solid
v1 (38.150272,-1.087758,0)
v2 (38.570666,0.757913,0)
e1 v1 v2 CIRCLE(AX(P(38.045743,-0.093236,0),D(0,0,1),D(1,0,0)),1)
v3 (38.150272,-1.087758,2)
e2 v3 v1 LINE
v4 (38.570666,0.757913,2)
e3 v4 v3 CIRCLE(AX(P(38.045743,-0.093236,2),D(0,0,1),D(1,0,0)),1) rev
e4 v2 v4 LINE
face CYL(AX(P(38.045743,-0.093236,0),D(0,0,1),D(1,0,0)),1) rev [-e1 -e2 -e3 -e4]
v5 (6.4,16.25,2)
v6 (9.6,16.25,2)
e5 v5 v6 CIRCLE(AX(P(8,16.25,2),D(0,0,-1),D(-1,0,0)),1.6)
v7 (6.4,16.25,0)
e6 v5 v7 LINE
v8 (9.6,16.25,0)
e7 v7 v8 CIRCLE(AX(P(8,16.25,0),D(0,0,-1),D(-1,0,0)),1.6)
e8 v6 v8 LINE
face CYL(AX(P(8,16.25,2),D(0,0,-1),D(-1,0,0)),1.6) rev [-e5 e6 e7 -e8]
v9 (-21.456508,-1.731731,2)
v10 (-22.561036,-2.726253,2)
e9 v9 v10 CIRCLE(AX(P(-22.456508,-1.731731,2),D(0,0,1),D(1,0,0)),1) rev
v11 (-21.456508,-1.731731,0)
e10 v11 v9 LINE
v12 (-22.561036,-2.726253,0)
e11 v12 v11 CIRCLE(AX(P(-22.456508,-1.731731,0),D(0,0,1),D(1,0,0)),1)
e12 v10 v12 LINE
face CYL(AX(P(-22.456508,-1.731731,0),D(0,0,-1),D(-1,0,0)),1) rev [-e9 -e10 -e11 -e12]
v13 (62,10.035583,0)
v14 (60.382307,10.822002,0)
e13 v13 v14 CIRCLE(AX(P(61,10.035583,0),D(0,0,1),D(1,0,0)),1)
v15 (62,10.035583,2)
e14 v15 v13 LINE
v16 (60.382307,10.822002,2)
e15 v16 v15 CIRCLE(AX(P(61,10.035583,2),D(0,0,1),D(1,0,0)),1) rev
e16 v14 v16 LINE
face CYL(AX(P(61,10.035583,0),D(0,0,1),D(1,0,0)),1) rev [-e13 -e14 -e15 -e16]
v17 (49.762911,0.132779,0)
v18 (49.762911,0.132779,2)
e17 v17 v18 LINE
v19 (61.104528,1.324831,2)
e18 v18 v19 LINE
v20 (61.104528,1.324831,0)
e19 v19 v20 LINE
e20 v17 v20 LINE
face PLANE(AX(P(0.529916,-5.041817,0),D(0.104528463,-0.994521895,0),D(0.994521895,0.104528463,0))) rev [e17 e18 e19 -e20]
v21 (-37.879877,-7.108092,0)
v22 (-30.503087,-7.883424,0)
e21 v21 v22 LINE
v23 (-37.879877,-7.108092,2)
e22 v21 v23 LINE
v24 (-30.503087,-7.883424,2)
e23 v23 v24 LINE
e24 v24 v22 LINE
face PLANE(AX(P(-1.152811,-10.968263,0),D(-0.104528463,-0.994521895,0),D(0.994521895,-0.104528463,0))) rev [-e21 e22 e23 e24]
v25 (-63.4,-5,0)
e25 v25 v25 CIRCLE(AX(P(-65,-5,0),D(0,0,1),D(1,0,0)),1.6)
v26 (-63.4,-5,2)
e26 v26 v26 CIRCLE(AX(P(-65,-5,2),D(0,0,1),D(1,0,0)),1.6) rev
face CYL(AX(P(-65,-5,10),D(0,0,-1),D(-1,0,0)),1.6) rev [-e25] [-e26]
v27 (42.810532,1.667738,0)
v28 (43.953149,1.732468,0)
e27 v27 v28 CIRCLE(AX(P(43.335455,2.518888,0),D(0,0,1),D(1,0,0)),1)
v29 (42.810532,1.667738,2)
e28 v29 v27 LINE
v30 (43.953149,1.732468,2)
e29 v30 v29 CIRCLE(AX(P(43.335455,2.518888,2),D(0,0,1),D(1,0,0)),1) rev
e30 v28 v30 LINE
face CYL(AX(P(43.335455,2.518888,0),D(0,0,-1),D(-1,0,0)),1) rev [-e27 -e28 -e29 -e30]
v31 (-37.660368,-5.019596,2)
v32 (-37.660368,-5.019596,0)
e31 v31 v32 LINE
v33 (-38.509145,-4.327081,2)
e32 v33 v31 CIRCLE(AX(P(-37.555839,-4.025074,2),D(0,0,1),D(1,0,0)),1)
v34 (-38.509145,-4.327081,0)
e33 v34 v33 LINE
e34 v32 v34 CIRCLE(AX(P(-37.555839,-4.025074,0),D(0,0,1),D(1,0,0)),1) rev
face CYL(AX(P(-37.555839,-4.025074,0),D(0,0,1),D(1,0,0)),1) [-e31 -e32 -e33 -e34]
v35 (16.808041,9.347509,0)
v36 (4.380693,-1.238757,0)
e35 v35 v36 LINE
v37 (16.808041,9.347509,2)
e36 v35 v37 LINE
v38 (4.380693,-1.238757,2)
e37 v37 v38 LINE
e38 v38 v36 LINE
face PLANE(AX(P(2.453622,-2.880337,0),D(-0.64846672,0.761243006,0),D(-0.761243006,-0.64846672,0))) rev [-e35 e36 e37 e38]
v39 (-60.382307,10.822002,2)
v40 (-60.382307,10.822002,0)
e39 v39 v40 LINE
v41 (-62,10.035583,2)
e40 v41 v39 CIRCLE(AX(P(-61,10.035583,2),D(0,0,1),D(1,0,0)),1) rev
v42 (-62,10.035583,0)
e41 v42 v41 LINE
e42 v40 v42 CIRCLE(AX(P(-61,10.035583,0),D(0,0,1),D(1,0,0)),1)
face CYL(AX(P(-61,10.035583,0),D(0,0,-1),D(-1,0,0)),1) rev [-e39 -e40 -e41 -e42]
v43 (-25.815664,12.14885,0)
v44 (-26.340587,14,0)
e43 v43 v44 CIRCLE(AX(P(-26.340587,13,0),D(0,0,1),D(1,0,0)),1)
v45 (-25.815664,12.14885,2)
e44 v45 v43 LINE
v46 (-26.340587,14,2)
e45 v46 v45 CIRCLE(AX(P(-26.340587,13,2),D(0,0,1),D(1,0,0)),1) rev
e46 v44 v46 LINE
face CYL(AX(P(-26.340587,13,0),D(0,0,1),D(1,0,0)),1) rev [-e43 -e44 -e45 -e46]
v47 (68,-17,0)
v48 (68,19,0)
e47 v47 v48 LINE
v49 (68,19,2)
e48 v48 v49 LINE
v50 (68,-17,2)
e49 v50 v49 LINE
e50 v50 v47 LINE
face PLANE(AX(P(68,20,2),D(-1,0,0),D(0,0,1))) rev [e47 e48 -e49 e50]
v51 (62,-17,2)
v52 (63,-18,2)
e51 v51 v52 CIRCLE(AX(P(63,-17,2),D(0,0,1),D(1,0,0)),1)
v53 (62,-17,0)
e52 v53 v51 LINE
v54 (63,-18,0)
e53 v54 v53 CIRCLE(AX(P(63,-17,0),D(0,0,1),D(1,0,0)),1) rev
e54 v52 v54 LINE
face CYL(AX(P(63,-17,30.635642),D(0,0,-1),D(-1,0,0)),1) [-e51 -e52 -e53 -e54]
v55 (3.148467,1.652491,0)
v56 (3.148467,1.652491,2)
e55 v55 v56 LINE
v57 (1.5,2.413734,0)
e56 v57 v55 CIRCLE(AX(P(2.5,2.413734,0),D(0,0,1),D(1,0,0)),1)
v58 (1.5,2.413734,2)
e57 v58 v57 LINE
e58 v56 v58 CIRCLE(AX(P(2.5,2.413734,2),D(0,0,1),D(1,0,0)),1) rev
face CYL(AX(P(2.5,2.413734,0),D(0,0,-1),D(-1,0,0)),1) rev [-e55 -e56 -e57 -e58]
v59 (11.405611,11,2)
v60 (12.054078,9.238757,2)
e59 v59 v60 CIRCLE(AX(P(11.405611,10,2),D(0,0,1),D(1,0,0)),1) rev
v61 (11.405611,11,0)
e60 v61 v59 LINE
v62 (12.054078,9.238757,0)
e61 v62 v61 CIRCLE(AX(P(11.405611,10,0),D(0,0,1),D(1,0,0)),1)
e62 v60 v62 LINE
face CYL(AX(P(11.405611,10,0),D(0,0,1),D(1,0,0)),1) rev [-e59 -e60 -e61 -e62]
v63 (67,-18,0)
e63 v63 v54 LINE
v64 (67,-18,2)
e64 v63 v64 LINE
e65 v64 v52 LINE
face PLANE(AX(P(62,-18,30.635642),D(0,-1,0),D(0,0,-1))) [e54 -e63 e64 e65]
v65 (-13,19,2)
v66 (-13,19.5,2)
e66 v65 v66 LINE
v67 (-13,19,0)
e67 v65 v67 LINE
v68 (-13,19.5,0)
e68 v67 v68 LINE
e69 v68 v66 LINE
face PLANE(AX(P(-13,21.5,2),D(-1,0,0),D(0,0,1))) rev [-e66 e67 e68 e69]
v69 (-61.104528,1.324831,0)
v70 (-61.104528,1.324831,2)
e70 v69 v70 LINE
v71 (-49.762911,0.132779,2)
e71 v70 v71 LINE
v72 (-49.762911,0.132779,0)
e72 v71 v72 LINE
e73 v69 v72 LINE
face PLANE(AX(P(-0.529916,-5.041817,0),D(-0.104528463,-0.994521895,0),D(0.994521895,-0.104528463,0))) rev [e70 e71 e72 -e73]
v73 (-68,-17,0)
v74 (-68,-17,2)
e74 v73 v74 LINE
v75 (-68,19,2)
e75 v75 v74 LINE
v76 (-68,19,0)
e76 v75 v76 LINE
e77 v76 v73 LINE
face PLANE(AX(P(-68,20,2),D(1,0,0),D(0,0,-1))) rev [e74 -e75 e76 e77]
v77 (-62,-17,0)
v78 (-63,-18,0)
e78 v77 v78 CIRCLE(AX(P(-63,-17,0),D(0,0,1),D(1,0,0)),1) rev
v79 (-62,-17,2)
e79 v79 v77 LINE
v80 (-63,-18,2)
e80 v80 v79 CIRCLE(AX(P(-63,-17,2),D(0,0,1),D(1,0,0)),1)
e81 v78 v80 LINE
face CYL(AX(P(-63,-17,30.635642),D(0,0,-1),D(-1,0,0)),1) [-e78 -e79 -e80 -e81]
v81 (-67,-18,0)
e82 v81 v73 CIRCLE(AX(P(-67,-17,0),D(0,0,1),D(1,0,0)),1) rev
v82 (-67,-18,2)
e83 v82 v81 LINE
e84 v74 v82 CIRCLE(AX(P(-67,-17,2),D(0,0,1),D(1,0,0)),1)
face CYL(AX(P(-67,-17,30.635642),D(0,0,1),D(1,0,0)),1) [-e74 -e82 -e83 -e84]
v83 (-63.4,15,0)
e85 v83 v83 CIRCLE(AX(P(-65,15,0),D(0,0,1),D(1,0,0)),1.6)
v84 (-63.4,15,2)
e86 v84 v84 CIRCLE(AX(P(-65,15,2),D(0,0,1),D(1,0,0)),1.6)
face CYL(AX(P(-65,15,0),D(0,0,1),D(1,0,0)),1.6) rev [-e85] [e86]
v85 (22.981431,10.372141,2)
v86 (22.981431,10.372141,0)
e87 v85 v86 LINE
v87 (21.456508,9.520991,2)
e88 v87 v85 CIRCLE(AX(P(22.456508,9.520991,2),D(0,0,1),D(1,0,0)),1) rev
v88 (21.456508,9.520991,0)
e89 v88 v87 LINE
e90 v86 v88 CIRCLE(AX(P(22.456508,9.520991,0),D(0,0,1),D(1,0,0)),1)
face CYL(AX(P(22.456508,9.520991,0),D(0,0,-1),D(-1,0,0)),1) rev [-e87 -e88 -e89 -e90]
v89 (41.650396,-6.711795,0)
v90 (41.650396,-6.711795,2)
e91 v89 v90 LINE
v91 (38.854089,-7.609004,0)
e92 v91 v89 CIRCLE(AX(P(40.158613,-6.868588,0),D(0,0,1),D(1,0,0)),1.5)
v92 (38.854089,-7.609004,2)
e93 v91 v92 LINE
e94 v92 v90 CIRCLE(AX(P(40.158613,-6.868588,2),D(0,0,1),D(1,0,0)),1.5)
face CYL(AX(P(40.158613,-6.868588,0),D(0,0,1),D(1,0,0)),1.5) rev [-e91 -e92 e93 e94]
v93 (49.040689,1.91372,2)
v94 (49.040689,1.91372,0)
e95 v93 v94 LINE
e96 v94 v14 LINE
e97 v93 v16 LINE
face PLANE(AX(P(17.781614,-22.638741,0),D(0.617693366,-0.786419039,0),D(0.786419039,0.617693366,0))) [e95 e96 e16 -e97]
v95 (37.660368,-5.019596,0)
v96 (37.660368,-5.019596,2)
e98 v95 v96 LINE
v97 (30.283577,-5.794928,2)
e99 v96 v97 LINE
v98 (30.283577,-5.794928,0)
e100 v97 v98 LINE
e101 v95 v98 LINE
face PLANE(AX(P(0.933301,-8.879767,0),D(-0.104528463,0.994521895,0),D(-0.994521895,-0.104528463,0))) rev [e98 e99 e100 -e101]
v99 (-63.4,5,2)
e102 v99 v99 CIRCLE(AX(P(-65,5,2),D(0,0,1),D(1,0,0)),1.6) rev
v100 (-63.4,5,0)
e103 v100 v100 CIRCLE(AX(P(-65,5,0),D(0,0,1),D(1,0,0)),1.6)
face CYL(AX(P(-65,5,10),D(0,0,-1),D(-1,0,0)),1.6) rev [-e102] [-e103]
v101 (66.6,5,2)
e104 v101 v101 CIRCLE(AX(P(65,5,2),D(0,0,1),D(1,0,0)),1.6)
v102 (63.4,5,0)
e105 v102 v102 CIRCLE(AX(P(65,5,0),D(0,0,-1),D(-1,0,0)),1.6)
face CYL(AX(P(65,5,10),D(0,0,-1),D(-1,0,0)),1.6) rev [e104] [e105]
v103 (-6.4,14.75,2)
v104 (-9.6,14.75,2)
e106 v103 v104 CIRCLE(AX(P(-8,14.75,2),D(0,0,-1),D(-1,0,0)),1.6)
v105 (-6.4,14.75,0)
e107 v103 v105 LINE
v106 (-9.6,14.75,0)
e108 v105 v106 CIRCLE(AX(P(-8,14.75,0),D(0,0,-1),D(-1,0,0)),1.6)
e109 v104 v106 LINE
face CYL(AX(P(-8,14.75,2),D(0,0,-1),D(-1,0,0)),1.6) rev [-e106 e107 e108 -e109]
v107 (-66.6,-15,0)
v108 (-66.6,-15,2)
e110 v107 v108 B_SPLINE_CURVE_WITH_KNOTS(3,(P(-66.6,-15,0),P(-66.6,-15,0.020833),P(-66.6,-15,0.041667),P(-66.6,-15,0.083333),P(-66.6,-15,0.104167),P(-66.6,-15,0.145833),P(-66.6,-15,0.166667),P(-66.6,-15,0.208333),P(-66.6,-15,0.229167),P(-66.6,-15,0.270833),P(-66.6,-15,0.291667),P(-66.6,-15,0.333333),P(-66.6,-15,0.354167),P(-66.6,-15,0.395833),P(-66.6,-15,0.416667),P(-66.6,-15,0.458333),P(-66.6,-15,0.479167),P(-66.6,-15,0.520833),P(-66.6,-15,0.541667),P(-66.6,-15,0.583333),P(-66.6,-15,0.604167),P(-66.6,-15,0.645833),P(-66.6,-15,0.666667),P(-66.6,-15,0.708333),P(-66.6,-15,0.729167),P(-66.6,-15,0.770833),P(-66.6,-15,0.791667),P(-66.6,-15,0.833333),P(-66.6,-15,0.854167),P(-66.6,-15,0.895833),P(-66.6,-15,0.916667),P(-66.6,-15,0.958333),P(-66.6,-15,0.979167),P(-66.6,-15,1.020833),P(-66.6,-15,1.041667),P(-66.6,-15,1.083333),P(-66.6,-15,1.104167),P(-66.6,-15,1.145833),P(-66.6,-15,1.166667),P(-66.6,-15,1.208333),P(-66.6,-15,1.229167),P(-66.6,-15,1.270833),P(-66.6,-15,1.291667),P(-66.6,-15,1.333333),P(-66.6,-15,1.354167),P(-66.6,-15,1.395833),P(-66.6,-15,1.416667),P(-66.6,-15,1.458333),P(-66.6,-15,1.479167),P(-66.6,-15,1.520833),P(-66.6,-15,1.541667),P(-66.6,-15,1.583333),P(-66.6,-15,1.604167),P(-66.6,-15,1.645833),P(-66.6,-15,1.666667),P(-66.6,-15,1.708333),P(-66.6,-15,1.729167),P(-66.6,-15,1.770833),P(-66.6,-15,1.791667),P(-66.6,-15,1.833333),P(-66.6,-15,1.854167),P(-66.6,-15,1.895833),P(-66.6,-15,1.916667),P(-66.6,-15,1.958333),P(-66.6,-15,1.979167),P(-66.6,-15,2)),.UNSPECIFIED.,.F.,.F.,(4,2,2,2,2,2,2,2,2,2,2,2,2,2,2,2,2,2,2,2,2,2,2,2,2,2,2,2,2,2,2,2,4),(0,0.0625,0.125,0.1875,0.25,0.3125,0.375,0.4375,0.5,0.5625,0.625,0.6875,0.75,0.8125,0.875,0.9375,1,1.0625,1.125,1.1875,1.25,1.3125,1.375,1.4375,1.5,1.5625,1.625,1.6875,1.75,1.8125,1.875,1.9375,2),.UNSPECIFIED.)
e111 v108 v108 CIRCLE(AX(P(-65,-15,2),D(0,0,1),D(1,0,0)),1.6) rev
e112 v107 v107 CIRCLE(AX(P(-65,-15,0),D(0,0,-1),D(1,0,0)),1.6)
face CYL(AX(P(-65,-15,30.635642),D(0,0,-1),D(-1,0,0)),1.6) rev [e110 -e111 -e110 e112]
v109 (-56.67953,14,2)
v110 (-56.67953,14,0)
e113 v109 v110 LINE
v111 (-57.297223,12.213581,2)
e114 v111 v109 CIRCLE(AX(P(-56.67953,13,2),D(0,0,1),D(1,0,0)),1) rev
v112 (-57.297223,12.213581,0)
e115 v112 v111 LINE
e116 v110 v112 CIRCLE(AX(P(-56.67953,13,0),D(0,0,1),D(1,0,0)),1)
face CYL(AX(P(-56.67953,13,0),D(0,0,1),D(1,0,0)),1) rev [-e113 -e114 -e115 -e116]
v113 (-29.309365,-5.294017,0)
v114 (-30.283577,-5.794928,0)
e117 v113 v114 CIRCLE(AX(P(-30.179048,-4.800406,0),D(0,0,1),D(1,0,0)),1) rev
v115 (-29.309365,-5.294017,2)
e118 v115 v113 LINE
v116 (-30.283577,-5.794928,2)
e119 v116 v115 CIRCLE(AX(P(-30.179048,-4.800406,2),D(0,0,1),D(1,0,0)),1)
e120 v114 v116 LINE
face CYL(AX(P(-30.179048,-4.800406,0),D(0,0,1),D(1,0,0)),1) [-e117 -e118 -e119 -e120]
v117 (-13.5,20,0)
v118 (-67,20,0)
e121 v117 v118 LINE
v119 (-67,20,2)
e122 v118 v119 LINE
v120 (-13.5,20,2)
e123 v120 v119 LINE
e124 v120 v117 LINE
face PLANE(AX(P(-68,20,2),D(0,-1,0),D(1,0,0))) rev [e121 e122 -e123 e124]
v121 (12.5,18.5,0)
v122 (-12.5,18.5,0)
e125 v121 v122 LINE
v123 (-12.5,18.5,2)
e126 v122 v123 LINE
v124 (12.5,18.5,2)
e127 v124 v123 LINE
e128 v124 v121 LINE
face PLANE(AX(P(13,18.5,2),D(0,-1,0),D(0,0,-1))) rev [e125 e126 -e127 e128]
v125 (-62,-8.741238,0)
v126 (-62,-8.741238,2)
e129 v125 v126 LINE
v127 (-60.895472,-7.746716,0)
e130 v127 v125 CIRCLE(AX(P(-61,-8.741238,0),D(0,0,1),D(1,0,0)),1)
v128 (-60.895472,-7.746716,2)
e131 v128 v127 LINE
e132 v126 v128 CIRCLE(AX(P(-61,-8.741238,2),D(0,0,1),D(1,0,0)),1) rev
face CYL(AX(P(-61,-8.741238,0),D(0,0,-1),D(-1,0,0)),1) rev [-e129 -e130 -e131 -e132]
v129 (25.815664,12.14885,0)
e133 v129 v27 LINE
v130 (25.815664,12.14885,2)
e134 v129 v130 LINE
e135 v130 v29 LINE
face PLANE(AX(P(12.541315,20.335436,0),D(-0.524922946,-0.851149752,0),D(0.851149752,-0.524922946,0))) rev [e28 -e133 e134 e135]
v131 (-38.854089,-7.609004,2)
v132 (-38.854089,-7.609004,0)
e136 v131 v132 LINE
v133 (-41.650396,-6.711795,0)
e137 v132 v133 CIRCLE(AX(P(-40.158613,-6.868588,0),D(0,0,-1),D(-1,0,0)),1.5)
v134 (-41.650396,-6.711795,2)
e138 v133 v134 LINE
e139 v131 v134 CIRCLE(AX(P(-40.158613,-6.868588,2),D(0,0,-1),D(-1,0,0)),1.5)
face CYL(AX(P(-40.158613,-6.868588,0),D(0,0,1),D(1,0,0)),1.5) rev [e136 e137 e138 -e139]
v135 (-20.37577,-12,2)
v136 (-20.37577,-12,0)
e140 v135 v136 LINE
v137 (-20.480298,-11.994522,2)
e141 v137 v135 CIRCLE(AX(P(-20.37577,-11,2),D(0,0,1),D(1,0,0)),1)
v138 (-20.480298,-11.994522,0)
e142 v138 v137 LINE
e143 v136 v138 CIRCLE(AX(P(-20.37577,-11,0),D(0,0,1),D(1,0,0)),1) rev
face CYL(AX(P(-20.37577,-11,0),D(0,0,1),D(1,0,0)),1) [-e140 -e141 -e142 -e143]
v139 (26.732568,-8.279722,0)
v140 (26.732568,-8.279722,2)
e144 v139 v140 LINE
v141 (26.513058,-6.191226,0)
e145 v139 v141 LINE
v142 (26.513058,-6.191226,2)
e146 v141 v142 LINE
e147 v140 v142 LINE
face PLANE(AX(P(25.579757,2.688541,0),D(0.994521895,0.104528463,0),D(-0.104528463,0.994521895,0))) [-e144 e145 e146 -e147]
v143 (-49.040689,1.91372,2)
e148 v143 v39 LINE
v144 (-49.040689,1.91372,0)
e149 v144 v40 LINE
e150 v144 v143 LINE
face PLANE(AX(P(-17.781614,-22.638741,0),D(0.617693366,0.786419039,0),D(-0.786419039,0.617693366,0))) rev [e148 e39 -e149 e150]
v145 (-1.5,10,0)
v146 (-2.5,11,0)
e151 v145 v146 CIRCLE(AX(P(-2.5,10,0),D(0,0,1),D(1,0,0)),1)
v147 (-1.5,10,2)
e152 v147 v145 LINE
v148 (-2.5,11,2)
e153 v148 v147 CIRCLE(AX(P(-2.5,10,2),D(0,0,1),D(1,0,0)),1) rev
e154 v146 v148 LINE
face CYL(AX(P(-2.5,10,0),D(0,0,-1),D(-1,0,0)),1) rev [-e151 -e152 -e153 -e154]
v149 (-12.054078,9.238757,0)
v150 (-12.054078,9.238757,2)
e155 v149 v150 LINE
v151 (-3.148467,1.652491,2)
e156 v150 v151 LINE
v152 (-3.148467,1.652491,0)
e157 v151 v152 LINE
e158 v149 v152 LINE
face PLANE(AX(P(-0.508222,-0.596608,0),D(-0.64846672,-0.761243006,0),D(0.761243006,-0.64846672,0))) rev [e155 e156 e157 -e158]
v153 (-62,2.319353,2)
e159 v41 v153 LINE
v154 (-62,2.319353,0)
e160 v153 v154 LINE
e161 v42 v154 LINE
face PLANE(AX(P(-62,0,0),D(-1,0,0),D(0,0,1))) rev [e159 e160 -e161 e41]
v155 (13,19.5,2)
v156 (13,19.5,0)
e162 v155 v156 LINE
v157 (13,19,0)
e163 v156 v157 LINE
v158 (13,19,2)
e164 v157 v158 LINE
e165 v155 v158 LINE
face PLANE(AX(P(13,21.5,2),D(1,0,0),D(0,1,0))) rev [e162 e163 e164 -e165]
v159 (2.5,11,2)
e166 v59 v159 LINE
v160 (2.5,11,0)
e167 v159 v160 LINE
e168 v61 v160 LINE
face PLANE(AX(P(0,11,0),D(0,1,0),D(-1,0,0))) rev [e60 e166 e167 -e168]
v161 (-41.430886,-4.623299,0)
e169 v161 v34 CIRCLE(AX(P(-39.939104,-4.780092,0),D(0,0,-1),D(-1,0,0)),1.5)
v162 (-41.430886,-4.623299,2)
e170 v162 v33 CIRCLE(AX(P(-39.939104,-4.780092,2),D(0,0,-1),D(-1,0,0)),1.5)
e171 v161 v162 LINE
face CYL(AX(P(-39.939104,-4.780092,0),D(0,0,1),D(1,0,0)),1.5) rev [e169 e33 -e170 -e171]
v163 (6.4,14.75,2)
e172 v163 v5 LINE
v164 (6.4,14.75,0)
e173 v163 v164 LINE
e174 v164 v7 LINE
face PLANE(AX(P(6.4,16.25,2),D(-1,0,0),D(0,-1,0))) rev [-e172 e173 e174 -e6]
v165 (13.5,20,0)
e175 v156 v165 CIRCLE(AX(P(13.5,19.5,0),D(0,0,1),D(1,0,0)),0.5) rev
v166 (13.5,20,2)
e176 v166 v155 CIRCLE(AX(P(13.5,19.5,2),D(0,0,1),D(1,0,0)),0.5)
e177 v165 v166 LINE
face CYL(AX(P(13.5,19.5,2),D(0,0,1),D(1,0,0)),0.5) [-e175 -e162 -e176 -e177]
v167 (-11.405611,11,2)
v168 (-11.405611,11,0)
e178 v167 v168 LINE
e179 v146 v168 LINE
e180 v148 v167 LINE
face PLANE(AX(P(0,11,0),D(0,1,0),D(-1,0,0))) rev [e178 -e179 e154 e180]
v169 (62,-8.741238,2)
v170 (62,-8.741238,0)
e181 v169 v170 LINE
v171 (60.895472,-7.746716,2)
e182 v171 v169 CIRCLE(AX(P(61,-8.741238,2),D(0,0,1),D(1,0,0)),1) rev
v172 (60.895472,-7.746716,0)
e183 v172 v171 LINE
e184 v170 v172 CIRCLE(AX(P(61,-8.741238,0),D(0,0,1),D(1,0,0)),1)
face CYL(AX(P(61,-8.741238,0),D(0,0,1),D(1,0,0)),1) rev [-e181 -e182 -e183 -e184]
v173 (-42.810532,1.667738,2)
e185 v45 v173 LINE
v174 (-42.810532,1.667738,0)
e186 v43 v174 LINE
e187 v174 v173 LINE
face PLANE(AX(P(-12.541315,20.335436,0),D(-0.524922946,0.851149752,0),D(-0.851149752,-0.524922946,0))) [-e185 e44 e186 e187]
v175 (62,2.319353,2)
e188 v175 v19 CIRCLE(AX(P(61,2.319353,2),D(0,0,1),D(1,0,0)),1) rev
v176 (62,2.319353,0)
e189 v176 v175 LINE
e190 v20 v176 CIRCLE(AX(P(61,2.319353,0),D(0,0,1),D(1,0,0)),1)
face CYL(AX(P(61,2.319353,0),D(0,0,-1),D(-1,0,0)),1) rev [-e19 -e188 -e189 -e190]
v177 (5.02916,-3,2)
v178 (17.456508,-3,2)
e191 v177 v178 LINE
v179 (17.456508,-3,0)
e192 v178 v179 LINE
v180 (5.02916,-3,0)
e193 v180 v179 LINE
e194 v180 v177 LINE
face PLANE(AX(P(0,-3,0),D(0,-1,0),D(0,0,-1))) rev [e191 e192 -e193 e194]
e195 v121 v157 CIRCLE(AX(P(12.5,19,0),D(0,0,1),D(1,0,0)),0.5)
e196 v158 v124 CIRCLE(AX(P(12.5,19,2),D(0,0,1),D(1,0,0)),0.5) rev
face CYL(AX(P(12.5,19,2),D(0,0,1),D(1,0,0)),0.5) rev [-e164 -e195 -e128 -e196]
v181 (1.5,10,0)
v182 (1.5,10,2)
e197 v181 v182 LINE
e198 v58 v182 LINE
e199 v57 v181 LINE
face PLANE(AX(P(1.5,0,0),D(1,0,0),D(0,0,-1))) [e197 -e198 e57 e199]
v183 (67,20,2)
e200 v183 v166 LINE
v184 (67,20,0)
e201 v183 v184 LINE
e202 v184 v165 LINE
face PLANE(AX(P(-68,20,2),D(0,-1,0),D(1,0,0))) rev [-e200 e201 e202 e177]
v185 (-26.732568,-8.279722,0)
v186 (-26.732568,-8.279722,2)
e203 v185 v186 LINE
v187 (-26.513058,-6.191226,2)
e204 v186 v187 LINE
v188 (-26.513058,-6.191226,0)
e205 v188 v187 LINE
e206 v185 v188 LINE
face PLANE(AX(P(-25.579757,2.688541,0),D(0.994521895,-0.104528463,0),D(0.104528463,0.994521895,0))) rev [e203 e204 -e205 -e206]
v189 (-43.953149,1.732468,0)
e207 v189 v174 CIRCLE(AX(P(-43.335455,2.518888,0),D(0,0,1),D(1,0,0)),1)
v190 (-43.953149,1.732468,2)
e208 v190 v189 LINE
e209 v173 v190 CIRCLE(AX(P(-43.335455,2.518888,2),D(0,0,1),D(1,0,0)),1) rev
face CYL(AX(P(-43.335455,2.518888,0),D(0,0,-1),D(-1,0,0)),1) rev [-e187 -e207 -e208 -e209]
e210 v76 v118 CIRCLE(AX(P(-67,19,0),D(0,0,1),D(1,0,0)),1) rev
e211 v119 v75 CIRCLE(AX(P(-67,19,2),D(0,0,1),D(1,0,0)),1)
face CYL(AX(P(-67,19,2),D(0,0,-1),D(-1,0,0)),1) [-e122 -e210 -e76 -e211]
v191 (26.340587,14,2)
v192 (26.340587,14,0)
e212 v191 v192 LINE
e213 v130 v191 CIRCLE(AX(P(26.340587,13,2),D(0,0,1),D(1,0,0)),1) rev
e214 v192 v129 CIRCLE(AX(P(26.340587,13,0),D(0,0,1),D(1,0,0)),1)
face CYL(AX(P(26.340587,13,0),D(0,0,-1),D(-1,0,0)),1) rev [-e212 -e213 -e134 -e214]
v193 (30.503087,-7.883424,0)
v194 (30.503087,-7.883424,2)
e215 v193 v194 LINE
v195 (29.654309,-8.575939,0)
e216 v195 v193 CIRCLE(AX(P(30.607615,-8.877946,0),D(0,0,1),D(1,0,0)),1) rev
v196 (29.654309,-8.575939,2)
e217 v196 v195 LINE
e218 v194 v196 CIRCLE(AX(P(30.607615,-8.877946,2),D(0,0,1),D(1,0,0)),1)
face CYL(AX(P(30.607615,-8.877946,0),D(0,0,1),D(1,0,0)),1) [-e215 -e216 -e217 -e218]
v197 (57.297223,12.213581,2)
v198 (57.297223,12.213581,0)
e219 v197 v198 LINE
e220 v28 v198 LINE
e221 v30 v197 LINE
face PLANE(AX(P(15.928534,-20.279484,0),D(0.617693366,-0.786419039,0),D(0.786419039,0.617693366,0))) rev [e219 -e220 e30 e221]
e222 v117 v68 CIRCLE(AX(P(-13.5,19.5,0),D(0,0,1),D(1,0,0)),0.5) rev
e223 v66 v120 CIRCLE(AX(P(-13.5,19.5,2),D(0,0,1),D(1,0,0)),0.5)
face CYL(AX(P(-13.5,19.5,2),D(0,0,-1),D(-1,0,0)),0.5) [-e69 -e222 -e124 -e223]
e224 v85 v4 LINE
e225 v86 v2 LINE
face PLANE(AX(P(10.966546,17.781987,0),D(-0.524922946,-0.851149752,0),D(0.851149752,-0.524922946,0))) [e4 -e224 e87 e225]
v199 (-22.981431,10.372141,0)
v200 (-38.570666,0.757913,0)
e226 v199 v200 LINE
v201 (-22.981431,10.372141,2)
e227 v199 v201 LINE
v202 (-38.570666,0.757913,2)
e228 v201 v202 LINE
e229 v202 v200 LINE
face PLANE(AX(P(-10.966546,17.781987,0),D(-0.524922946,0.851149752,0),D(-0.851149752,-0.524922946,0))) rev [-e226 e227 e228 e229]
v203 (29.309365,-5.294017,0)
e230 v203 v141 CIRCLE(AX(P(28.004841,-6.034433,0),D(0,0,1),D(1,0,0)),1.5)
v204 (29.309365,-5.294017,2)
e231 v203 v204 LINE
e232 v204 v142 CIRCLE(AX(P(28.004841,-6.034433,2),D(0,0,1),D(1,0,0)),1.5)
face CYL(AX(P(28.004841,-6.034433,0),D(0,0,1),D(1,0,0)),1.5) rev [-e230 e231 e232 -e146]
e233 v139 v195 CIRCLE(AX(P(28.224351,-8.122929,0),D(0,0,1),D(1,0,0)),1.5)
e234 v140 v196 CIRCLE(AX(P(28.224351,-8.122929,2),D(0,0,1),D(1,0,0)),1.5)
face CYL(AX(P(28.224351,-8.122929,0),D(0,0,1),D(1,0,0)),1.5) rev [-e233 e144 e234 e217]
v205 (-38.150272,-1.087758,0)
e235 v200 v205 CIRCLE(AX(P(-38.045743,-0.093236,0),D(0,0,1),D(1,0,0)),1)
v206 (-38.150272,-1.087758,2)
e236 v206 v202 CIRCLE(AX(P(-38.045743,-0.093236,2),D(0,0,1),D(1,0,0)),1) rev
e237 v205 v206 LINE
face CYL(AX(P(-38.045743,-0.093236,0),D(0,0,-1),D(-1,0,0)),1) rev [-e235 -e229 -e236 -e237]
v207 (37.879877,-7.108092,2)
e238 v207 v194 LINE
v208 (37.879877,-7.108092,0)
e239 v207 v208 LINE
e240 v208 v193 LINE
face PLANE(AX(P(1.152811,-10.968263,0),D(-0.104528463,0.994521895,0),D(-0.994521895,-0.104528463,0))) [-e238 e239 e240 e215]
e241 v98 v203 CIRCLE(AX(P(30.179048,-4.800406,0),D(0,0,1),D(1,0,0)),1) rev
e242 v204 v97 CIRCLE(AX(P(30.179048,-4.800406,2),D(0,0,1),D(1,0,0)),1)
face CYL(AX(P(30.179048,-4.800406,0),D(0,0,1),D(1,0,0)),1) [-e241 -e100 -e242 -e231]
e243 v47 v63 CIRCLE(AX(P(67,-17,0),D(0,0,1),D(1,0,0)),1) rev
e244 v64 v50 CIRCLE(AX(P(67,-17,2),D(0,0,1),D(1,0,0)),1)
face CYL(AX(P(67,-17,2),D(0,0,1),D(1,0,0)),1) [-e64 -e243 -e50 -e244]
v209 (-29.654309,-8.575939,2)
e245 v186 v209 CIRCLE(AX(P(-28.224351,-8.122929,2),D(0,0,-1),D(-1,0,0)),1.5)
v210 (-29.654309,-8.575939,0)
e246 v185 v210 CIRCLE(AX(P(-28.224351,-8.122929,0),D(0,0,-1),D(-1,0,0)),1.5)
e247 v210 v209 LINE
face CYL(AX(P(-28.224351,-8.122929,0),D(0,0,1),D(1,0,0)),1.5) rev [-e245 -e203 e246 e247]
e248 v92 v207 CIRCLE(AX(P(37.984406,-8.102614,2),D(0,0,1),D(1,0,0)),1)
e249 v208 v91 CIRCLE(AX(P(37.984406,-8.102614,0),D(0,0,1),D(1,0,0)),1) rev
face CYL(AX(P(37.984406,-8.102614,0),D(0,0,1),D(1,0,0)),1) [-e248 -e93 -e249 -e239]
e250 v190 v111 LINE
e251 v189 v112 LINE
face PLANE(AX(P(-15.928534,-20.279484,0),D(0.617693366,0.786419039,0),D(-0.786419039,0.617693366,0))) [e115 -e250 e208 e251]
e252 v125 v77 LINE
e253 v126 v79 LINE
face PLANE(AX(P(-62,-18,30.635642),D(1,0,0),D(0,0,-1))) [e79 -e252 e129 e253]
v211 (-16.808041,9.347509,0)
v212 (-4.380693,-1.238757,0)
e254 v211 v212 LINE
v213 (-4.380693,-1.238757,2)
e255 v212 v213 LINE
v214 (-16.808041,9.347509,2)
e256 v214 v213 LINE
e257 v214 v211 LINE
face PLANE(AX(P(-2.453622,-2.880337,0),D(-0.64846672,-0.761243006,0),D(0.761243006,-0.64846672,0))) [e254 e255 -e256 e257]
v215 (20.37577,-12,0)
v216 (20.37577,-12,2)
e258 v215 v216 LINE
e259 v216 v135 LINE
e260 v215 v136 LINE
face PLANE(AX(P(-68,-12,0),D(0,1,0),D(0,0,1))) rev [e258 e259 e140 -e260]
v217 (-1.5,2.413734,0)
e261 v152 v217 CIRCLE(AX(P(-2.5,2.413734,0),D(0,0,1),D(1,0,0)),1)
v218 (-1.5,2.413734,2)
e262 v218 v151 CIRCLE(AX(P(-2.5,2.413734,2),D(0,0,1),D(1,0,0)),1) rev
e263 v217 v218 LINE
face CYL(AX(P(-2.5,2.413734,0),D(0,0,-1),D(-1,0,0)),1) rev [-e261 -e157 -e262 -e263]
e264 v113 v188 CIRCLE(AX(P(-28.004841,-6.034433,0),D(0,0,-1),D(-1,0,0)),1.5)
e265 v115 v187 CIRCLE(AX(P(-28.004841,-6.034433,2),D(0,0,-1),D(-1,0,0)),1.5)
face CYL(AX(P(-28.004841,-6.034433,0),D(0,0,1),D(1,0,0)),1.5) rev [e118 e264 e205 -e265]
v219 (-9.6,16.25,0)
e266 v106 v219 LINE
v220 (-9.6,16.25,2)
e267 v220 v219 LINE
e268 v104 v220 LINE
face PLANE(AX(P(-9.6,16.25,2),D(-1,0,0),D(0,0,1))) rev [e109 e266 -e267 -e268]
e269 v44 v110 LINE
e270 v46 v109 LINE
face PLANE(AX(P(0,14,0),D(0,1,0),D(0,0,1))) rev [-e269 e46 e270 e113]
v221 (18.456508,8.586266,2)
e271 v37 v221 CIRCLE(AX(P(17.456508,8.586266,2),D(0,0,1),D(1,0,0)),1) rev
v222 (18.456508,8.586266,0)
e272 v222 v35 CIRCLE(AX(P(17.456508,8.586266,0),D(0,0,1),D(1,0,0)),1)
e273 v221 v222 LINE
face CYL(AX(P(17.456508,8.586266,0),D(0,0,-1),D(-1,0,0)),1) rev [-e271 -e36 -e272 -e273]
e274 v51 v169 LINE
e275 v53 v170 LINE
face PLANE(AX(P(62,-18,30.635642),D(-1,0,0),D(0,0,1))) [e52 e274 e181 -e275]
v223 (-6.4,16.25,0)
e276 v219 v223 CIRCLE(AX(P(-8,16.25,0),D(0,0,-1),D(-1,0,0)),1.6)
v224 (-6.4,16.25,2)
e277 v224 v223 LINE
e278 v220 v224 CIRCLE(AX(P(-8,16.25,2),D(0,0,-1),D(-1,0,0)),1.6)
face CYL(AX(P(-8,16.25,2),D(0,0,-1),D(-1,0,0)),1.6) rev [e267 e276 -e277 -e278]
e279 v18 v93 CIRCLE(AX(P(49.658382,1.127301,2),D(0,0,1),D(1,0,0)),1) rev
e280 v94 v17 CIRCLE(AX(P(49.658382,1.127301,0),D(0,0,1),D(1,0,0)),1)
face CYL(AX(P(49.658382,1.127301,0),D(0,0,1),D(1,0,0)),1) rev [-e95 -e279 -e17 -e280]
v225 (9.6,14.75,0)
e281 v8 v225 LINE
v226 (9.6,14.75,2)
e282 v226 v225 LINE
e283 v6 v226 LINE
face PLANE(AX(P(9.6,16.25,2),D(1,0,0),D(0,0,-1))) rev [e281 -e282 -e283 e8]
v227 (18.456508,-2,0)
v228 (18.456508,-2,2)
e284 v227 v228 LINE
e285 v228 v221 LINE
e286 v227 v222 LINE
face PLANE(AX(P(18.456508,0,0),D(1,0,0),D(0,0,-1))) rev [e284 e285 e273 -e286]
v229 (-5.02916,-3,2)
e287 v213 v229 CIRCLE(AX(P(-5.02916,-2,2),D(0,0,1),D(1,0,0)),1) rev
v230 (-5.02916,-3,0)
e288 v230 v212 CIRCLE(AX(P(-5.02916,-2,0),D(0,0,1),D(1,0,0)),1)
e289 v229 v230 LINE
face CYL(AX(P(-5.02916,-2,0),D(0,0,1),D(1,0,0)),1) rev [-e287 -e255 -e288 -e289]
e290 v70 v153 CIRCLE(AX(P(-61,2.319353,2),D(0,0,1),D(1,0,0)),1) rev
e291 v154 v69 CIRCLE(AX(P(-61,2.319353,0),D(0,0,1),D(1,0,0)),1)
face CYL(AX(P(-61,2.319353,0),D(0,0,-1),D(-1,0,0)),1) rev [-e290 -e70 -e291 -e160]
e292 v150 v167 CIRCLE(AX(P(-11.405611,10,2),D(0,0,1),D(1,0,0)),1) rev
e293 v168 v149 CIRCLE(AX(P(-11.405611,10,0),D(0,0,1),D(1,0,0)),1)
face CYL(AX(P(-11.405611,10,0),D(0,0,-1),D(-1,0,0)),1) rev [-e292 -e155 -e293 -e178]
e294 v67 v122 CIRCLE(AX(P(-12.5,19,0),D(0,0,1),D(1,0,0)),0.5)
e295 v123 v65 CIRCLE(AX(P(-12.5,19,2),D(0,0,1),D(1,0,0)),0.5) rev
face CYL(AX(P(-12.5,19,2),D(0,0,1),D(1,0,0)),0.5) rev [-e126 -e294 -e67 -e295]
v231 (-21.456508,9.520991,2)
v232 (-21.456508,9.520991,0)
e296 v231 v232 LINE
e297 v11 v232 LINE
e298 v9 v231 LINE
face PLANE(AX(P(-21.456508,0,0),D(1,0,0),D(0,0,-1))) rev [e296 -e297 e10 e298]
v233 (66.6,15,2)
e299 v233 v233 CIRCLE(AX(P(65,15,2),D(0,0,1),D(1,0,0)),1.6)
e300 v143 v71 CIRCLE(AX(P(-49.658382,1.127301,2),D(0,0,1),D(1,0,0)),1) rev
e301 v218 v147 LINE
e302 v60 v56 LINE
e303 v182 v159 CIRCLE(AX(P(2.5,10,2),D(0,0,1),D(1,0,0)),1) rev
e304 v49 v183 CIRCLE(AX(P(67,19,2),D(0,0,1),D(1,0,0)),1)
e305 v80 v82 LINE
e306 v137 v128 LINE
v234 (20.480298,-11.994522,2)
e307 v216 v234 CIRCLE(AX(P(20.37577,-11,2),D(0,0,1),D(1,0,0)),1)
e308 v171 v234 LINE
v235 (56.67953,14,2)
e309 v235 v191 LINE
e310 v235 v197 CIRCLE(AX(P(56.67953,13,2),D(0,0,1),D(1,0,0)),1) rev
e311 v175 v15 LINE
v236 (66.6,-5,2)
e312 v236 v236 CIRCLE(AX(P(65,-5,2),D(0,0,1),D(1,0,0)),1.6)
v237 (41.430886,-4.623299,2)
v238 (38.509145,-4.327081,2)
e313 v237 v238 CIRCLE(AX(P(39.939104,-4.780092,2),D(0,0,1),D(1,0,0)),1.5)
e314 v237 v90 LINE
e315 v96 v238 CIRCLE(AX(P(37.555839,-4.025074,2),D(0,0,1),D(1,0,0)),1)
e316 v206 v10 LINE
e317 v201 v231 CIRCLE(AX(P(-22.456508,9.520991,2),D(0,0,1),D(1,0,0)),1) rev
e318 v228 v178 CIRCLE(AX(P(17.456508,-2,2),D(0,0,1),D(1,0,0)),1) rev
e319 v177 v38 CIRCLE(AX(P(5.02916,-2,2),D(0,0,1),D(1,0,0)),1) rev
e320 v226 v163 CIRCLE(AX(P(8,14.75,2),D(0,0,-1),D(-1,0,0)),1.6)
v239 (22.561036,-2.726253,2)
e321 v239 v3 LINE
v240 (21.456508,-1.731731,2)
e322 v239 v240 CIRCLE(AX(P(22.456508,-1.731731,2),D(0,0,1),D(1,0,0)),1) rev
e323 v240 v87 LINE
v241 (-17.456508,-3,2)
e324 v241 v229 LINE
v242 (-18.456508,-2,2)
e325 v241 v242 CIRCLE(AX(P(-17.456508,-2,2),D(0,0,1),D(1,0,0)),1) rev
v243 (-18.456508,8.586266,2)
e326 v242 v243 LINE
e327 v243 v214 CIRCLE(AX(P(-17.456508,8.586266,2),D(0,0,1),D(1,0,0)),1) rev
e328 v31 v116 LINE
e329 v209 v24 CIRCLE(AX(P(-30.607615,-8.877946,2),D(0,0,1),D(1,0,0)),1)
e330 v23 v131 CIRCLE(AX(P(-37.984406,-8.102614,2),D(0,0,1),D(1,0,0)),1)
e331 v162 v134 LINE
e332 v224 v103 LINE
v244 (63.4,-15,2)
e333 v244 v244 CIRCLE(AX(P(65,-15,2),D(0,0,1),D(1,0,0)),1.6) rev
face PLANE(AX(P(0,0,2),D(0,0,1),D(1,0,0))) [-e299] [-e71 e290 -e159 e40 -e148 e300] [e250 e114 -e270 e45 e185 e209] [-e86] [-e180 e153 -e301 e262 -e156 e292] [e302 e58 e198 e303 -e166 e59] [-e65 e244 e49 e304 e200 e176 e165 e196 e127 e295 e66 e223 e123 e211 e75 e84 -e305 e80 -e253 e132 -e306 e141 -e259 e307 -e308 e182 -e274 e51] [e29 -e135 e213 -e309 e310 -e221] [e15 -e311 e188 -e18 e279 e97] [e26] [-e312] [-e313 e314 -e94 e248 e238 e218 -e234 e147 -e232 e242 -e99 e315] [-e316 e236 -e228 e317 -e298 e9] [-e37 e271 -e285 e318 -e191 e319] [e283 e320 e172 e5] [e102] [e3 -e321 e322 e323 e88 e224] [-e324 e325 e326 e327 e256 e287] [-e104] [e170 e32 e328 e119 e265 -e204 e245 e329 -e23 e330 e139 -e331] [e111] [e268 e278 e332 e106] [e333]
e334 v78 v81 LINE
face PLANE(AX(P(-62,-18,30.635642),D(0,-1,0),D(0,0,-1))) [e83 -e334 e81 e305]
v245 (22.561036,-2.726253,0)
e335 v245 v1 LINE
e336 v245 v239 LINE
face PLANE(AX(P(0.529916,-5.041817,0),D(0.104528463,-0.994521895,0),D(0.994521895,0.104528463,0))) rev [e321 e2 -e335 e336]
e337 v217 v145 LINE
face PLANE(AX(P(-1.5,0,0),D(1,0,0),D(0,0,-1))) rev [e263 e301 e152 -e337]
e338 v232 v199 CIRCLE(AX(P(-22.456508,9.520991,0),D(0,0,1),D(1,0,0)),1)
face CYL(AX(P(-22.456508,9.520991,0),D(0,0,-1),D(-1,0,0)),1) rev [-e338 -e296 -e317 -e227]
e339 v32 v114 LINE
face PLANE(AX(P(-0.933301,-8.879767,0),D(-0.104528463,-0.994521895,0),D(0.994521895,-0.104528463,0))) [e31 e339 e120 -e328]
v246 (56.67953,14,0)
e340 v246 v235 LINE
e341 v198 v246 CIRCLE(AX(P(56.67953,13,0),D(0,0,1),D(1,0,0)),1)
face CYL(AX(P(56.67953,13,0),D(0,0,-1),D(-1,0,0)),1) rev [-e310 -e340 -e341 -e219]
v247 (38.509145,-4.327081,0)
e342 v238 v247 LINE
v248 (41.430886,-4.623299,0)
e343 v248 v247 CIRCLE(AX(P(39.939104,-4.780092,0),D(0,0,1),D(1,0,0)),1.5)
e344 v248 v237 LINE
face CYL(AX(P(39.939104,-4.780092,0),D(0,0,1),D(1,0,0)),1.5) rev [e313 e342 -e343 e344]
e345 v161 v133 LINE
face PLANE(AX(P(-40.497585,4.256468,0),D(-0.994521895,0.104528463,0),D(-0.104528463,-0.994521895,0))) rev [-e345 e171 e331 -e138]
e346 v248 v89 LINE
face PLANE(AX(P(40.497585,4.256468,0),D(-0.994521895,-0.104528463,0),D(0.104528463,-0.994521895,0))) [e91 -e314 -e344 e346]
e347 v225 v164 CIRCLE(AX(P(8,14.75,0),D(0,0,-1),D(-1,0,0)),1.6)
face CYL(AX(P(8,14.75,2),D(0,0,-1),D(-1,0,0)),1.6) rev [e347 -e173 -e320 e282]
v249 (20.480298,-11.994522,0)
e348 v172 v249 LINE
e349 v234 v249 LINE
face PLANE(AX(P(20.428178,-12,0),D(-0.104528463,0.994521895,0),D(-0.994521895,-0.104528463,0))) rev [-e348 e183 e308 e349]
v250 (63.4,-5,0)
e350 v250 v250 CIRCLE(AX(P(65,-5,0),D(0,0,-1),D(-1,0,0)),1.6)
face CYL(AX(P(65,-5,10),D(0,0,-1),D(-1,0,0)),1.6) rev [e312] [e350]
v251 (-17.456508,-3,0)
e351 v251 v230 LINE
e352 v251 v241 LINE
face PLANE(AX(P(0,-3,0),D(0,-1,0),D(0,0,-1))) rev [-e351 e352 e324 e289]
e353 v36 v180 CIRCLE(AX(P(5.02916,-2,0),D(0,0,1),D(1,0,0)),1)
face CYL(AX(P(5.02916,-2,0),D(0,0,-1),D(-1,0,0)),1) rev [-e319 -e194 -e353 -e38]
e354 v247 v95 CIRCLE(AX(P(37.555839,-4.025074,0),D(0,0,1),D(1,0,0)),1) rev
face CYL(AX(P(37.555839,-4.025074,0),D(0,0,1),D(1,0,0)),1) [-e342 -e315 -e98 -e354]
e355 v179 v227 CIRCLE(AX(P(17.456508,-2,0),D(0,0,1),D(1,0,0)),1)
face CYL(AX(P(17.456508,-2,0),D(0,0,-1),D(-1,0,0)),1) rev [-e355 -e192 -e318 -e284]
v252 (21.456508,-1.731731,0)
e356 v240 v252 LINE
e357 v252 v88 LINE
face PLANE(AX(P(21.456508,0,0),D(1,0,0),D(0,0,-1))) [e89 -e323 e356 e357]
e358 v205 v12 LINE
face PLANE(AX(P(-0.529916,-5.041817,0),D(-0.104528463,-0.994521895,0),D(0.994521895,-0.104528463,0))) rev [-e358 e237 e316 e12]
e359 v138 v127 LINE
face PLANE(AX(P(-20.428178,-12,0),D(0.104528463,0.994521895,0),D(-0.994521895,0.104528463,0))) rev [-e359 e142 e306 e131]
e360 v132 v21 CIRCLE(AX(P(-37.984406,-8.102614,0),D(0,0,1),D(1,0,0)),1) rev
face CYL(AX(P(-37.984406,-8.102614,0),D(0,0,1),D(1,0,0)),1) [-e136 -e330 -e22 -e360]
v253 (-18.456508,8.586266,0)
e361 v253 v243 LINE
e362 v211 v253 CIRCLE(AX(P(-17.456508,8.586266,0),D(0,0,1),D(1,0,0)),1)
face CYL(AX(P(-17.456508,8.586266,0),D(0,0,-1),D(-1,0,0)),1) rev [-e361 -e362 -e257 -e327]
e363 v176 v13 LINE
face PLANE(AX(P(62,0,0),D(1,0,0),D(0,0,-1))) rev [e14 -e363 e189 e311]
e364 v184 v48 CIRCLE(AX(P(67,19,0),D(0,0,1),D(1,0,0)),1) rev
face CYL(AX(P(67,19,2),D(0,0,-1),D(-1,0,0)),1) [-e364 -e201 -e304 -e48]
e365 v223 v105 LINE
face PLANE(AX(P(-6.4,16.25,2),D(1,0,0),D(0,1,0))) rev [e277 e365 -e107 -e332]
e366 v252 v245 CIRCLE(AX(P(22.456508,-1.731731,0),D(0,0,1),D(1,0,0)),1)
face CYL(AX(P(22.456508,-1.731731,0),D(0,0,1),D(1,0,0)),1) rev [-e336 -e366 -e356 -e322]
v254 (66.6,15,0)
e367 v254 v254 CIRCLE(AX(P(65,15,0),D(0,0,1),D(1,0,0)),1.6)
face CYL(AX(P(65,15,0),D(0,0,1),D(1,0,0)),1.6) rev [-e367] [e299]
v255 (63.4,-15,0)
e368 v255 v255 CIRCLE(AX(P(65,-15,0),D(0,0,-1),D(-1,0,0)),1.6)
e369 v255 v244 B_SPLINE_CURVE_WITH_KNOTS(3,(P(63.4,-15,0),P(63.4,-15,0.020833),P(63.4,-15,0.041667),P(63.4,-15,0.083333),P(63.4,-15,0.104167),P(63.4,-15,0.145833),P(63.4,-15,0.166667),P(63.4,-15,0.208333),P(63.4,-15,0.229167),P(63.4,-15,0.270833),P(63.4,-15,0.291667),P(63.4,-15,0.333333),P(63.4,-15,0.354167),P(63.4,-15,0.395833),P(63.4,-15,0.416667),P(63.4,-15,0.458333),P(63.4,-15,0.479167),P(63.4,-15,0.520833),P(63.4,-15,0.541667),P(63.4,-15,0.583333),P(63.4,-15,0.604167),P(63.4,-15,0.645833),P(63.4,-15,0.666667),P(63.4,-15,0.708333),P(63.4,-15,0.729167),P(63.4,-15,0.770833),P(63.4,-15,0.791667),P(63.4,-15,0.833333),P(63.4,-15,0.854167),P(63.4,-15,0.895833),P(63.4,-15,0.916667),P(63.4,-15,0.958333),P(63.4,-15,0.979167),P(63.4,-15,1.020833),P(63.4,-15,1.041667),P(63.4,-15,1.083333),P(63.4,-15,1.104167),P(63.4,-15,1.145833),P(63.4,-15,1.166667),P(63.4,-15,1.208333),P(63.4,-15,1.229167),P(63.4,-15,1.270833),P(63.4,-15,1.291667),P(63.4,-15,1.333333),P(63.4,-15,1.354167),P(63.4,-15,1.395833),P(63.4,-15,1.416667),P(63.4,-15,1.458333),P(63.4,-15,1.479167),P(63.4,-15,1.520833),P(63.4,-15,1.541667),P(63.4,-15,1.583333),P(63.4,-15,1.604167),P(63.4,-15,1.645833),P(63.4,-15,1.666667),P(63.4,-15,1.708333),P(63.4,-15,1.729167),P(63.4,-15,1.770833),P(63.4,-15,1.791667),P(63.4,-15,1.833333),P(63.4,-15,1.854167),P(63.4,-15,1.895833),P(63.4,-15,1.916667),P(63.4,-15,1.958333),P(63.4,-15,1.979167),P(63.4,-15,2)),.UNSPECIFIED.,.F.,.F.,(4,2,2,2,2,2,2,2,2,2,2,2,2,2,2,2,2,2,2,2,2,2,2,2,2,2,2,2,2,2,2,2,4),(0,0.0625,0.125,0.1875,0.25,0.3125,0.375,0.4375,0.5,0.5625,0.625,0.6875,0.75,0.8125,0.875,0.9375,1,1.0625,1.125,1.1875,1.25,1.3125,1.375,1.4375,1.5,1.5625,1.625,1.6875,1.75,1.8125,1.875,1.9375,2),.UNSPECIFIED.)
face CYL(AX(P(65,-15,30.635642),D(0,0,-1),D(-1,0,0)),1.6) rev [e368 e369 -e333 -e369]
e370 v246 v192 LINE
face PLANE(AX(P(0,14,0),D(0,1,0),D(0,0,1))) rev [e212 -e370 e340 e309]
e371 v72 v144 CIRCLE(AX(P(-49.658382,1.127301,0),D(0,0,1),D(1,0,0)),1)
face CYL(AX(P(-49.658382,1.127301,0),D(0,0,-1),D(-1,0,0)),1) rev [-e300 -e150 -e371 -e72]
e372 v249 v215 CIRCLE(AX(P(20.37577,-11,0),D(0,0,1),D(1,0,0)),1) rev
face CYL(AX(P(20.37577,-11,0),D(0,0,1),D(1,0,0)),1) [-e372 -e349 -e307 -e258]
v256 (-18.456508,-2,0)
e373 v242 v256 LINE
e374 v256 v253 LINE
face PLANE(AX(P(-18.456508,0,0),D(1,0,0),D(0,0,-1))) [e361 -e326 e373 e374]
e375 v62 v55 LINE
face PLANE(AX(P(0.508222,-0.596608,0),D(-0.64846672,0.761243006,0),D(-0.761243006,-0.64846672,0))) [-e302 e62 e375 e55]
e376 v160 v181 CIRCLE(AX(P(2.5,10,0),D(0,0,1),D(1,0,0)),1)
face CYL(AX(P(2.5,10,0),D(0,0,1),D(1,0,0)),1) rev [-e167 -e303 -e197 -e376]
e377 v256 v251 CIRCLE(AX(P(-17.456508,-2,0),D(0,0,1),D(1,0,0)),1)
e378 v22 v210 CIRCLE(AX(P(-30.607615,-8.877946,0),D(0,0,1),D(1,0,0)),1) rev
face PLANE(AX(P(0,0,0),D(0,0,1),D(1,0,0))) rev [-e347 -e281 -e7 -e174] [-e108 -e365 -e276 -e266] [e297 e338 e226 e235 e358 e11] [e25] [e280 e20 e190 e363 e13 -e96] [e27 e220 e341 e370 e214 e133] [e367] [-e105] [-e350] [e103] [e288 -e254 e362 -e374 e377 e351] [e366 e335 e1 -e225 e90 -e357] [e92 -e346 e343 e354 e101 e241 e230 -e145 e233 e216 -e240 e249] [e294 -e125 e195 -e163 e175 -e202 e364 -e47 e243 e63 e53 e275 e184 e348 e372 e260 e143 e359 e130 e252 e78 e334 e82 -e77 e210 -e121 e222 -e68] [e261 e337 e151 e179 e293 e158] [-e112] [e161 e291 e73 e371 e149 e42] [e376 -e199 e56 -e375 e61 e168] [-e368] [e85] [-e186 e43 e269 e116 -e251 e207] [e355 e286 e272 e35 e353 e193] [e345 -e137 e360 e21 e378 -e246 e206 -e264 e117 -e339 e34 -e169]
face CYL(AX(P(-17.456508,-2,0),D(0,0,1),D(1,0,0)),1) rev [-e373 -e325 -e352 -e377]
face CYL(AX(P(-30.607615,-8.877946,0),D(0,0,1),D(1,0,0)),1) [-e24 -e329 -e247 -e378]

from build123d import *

# Parameters (mm, degrees)
SKETCH_1_W           = 136
SKETCH_1_H           = 40
EXTRUDE_1_DEPTH      = 2
SKETCH_3_R           = 1.6
CUT_EXTRUDE_3_DEPTH  = 71.908391605
CUT_EXTRUDE_5_DEPTH  = 71.908391605
SKETCH_7_W           = 136
SKETCH_7_H           = 8
CUT_EXTRUDE_6_DEPTH  = 71.908391605
CUT_EXTRUDE_7_DEPTH  = 71.908391605
CUT_EXTRUDE_START    = -2
CUT_EXTRUDE_8_DEPTH  = 2
FILLET_2_R           = 1
FILLET_3_R           = 1
SKETCH_11_W          = 26
SKETCH_11_H          = 3
CUT_EXTRUDE_9_DEPTH  = 71.908391605
FILLET_4_R           = 0.5
SKETCH_13_W          = 6
SKETCH_13_H          = 28
SKETCH_13_R          = 1.6
EXTRUDE_2_DEPTH      = 2
SKETCH_14_R          = 1.6
CUT_EXTRUDE_10_DEPTH = 10
FILLET_5_R           = 1
FILLET_6_R           = 1


# Read off the part's stored shape, not the designer's step: 切除-拉伸8
with BuildPart() as part:
    # 草图1 → 凸台-拉伸1 (new body)
    with BuildSketch(Plane.XY):
        Rectangle(SKETCH_1_W, SKETCH_1_H)
    extrude(amount=EXTRUDE_1_DEPTH)

    # 草图3 → 切除-拉伸3 (cut, through all)
    with BuildSketch(Plane.XY.offset(2)):
        with Locations((65, -5)):
            Circle(SKETCH_3_R)
        with Locations((65, 15)):
            Circle(SKETCH_3_R)
        with Locations((-65, 15)):
            Circle(SKETCH_3_R)
        with Locations((-65, -5)):
            Circle(SKETCH_3_R)
    extrude(amount=-CUT_EXTRUDE_3_DEPTH, mode=Mode.SUBTRACT)

    # 草图6 → 切除-拉伸5 (cut, through all)
    with BuildSketch(Plane.XY.offset(2)):
        with BuildLine():
            Line((26.513057993, -6.191225838), (29.496623679, -5.877640448))
            ThreePointArc((29.496623679, -5.877640448), (27.848048141, -4.5426503), (26.513057993, -6.191225838))
        make_face()
        Polygon((29.716133451, -7.966136428), (29.496623679, -5.877640448), (26.513057993, -6.191225838), (26.732567765, -8.279721818), align=None)
        with BuildLine():
            ThreePointArc((26.732567765, -8.279721818), (28.381143303, -9.614711966), (29.716133451, -7.966136428))
            Line((29.716133451, -7.966136428), (26.732567765, -8.279721818))
        make_face()
        Polygon((38.66683051, -7.025380259), (38.447320737, -4.936884279), (29.496623679, -5.877640448), (29.716133451, -7.966136428), align=None)
        Polygon((41.650396196, -6.711794869), (41.430886423, -4.623298889), (38.447320737, -4.936884279), (38.66683051, -7.025380259), align=None)
        with BuildLine():
            Line((38.447320737, -4.936884279), (41.430886423, -4.623298889))
            ThreePointArc((41.430886423, -4.623298889), (39.782310885, -3.288308741), (38.447320737, -4.936884279))
        make_face()
        with BuildLine():
            ThreePointArc((38.66683051, -7.025380259), (40.315406048, -8.360370407), (41.650396196, -6.711794869))
            Line((41.650396196, -6.711794869), (38.66683051, -7.025380259))
        make_face()
    cut_extrude_5 = extrude(amount=-CUT_EXTRUDE_5_DEPTH, mode=Mode.SUBTRACT)

    # 镜向1: 切除-拉伸5 across plane
    add(cut_extrude_5.mirror(Plane(origin=(0, 0, 0), x_dir=(0, 0, 1), z_dir=(1, 0, 0))), mode=Mode.SUBTRACT)

    # 草图7 → 切除-拉伸6 (cut, through all)
    with BuildSketch(Plane.XY.offset(2)):
        with Locations((0, -16)):
            Rectangle(SKETCH_7_W, SKETCH_7_H)
    extrude(amount=-CUT_EXTRUDE_6_DEPTH, mode=Mode.SUBTRACT)

    # 草图8 → 切除-拉伸7 (cut, through all)
    with BuildSketch(Plane.XY.offset(2)):
        Polygon((-68, -7), (-68, -12), (-20.428177729, -12), align=None)
        Polygon((20.428177729, -12), (68, -7), (68, -12), align=None)
    extrude(amount=-CUT_EXTRUDE_7_DEPTH, mode=Mode.SUBTRACT)

    # 切除-拉伸8 outline → 切除-拉伸8 (cut)
    with BuildSketch(Plane.XY.offset(2).offset(CUT_EXTRUDE_START)):
        Polygon((18.456507715, 10.75175987), (2.313148778, -3), (18.456507715, -3), align=None)
        Polygon((-18.456507715, 10.75175987), (-18.456507715, -3), (-2.313148778, -3), align=None)
        Polygon((-62, 12.092619933), (-62, 1.418949104), (-46.311418135, -0.229987295), align=None)
        Polygon((-21.456507715, 11.312594625), (-41.066399544, -0.781260963), (-21.456507715, -2.842343647), align=None)
        Polygon((-59.571610636, 14), (-43.404423487, 1.301471928), (-22.814069976, 14), align=None)
        Polygon((43.404423487, 1.301471928), (59.571610636, 14), (22.814069976, 14), align=None)
        Polygon((-14.121622282, 11), (-1.5, 0.24824013), (-1.5, 11), align=None)
        Polygon((1.5, 0.24824013), (14.121622282, 11), (1.5, 11), align=None)
        Polygon((41.066399544, -0.781260963), (21.456507715, 11.312594625), (21.456507715, -2.842343647), align=None)
        Polygon((62, 12.092619933), (46.311418135, -0.229987295), (62, 1.418949104), align=None)
    extrude(amount=CUT_EXTRUDE_8_DEPTH, mode=Mode.SUBTRACT)

    # 圆角2
    fillet_2_edges = [part.edges().sort_by_distance(p)[0] for p in [
        (-68, -7, 1),
        (-20.428177729, -12, 1),
        (20.428177729, -12, 1),
        (68, -7, 1),
        (-68, 20, 1),
        (68, 20, 1),
    ]]
    fillet(fillet_2_edges, radius=FILLET_2_R)

    # 圆角3
    fillet_3_edges = [part.edges().sort_by_distance(p)[0] for p in [
        (14.121622282, 11, 1),
        (1.5, 0.24824013, 1),
        (1.5, 11, 1),
        (46.311418135, -0.229987295, 1),
        (62, 12.092619933, 1),
        (62, 1.418949104, 1),
        (21.456507715, 11.312594625, 1),
        (41.066399544, -0.781260963, 1),
        (21.456507715, -2.842343647, 1),
        (43.404423487, 1.301471928, 1),
        (22.814069976, 14, 1),
        (59.571610636, 14, 1),
        (-18.456507715, -3, 1),
        (-18.456507715, 10.75175987, 1),
        (-2.313148778, -3, 1),
        (-1.5, 11, 1),
        (-1.5, 0.24824013, 1),
        (-14.121622282, 11, 1),
        (-43.404423487, 1.301471928, 1),
        (-59.571610636, 14, 1),
        (-22.814069976, 14, 1),
        (-21.456507715, -2.842343647, 1),
        (-41.066399544, -0.781260963, 1),
        (-21.456507715, 11.312594625, 1),
        (-46.311418135, -0.229987295, 1),
        (-62, 1.418949104, 1),
        (-62, 12.092619933, 1),
        (18.456507715, -3, 1),
        (2.313148778, -3, 1),
        (18.456507715, 10.75175987, 1),
        (29.496623679, -5.877640448, 1),
        (38.447320737, -4.936884279, 1),
        (38.66683051, -7.025380259, 1),
        (29.716133451, -7.966136428, 1),
        (-29.496623679, -5.877640448, 1),
        (-29.716133451, -7.966136428, 1),
        (-38.66683051, -7.025380259, 1),
        (-38.447320737, -4.936884279, 1),
    ]]
    fillet(fillet_3_edges, radius=FILLET_3_R)

    # 草图11 → 切除-拉伸9 (cut, through all)
    with BuildSketch(Plane(origin=(0, 0, 0), x_dir=(-1, 0, 0), z_dir=(0, 0, -1))):
        with BuildLine():
            Line((-6.4, 16.25), (-6.4, 14.75))
            ThreePointArc((-6.4, 14.75), (-8, 13.15), (-9.6, 14.75))
            Line((-9.6, 14.75), (-9.6, 16.25))
            ThreePointArc((-9.6, 16.25), (-8, 17.85), (-6.4, 16.25))
        make_face()
        with BuildLine():
            Line((9.6, 16.25), (9.6, 14.75))
            ThreePointArc((9.6, 14.75), (8, 13.15), (6.4, 14.75))
            Line((6.4, 14.75), (6.4, 16.25))
            ThreePointArc((6.4, 16.25), (8, 17.85), (9.6, 16.25))
        make_face()
        with Locations((0, 20)):
            Rectangle(SKETCH_11_W, SKETCH_11_H)
    extrude(amount=-CUT_EXTRUDE_9_DEPTH, mode=Mode.SUBTRACT)

    # 圆角4
    fillet_4_edges = [part.edges().sort_by_distance(p)[0] for p in [
        (13, 20, 1),
        (-13, 20, 1),
        (13, 18.5, 1),
        (-13, 18.5, 1),
    ]]
    fillet(fillet_4_edges, radius=FILLET_4_R)

    # 草图13 → 凸台-拉伸2 (add)
    # profile 1 of 2: a face of its own
    with BuildSketch(Plane(origin=(0, 0, 0), x_dir=(-1, 0, 0), z_dir=(0, 0, -1))):
        with Locations((-65, -4)):
            Rectangle(SKETCH_13_W, SKETCH_13_H)
        with Locations((-65, -15)):
            Circle(SKETCH_13_R, mode=Mode.SUBTRACT)
    # profile 2 of 2: a face of its own
    with BuildSketch(Plane(origin=(0, 0, 0), x_dir=(-1, 0, 0), z_dir=(0, 0, -1))):
        with Locations((65, -4)):
            Rectangle(SKETCH_13_W, SKETCH_13_H)
        with Locations((65, -15)):
            Circle(SKETCH_13_R, mode=Mode.SUBTRACT)
    extrude(amount=-EXTRUDE_2_DEPTH)

    # 草图14 → 切除-拉伸10 (cut)
    with BuildSketch(Plane(origin=(0, 0, 0), x_dir=(-1, 0, 0), z_dir=(0, 0, -1))):
        with Locations((-65, 5)):
            Circle(SKETCH_14_R)
        with Locations((-65, -5)):
            Circle(SKETCH_14_R)
    cut_extrude_10 = extrude(amount=-CUT_EXTRUDE_10_DEPTH, mode=Mode.SUBTRACT)

    # 圆角5
    fillet_5_edges = [part.edges().sort_by_distance(p)[0] for p in [
        (68, -18, 1),
        (62, -7.630625412, 1),
        (62, -18, 1),
    ]]
    fillet(fillet_5_edges, radius=FILLET_5_R)

    # 镜向4: 切除-拉伸10 across plane
    add(cut_extrude_10.mirror(Plane(origin=(0, 0, 0), x_dir=(0, 0, 1), z_dir=(1, 0, 0))), mode=Mode.SUBTRACT)

    # 圆角6
    fillet_6_edges = [part.edges().sort_by_distance(p)[0] for p in [
        (-62, -18, 1),
        (-62, -7.630625412, 1),
        (-68, -18, 1),
    ]]
    fillet(fillet_6_edges, radius=FILLET_6_R)


solid = part.part
